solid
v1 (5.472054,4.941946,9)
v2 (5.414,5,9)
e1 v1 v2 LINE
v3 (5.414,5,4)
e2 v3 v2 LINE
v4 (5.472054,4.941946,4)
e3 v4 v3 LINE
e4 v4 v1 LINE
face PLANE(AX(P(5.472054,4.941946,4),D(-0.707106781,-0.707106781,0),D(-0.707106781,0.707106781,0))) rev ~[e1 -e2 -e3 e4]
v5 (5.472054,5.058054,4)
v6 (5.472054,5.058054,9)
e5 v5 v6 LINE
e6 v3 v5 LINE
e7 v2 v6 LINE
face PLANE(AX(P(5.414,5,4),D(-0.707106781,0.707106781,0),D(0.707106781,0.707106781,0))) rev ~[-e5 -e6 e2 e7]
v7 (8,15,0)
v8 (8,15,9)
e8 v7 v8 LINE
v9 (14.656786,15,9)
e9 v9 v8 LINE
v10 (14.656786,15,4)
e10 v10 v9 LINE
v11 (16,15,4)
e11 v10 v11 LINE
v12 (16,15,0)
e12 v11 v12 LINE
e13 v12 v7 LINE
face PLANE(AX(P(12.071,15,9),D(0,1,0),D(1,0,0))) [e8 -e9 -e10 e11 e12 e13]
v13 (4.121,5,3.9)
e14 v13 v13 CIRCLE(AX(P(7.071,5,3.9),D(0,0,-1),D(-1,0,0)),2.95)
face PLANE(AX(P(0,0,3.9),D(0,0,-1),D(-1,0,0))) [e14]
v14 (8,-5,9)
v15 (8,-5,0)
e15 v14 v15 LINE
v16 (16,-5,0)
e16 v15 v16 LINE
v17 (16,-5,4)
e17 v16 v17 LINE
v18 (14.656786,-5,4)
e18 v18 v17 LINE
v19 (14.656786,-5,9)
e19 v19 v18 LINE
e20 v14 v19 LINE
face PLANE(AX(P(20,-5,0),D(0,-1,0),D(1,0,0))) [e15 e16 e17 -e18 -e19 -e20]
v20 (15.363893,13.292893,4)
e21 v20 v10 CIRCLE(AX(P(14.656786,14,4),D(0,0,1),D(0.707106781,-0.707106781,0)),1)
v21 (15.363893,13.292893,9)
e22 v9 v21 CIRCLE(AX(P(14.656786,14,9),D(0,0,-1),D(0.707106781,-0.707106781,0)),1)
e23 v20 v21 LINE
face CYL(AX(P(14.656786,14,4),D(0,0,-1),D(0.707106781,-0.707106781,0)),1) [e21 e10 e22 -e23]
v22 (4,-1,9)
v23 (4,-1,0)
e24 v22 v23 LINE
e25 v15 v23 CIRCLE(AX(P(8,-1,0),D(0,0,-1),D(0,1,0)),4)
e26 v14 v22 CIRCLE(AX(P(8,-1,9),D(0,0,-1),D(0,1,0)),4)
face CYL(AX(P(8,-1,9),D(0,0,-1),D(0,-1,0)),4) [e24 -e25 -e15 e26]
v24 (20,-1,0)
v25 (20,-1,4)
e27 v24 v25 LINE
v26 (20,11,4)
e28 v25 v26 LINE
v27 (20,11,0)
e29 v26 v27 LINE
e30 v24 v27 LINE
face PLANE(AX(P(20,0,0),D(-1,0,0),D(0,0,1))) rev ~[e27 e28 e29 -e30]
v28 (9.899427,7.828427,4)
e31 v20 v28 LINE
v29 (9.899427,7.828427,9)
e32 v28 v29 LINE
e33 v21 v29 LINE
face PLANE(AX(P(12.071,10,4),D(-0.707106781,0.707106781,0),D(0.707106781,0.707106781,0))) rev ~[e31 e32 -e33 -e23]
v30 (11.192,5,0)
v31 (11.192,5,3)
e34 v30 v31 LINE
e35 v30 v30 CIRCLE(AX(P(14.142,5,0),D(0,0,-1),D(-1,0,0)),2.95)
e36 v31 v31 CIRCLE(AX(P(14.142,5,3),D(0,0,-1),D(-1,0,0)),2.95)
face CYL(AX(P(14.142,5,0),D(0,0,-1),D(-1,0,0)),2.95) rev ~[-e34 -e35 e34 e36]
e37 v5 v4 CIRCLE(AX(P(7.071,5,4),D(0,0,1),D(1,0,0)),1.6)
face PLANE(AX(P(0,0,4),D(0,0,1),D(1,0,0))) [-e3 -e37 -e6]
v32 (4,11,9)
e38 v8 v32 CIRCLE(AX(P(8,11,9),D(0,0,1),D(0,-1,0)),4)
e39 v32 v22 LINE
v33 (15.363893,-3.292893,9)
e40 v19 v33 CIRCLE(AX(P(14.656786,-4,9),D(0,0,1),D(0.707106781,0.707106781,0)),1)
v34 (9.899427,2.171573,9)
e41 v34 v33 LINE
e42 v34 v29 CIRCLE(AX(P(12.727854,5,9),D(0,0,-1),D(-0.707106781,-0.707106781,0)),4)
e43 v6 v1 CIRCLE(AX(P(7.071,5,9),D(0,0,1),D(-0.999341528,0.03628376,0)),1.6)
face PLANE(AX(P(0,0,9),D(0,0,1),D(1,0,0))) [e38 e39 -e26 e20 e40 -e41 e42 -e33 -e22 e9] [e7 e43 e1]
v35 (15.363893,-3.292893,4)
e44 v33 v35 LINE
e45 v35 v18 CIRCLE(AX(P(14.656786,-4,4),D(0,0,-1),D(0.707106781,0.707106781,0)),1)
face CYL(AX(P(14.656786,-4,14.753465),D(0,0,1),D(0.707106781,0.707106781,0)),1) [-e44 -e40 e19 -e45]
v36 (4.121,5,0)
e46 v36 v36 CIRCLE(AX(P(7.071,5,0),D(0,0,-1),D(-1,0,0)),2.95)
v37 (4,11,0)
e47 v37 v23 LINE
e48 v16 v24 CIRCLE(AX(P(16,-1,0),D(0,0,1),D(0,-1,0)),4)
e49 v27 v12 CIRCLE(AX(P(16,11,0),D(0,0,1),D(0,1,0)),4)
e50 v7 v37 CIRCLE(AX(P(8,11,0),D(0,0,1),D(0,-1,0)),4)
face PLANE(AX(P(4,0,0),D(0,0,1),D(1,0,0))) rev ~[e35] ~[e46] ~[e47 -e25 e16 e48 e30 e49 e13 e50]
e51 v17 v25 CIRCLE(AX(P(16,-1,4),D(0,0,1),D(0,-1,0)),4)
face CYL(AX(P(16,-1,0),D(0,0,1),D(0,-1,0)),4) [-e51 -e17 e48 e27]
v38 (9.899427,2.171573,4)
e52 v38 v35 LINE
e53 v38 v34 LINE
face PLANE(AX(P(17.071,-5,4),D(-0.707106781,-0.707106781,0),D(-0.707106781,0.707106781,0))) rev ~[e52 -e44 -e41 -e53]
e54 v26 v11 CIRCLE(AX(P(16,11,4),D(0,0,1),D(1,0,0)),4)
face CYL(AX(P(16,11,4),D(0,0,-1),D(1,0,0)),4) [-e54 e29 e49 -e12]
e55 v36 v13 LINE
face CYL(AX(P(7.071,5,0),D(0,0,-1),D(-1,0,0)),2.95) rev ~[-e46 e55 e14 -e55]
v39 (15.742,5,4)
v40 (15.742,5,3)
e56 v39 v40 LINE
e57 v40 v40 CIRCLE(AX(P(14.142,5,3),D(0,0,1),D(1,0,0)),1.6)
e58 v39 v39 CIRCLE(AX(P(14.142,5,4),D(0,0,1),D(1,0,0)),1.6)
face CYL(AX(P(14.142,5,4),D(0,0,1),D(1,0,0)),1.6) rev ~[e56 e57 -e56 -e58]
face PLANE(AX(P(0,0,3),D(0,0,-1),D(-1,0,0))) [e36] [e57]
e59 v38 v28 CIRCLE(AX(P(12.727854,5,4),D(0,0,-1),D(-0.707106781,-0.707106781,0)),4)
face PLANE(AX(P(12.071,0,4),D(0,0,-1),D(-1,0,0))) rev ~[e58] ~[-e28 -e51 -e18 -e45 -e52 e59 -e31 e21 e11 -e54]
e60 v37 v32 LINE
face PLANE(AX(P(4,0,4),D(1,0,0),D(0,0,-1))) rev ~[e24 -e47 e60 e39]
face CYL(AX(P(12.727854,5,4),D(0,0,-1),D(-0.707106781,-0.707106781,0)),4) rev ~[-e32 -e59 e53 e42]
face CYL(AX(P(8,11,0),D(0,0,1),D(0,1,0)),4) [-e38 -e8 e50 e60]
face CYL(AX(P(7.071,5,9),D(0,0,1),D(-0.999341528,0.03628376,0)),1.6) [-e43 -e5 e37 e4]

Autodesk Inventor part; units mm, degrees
ref_plane "YZ Plane" through (0, 0, 0) normal (1, 0, 0) x (0, 1, 0)
ref_plane "XZ Plane" through (0, 0, 0) normal (0, 1, 0) x (-1, 0, 0)
ref_plane "XY Plane" through (0, 0, 0) normal (0, 0, 1) x (1, 0, 0)
sketch "Sketch1" plane through (0, 0, 0) normal (0, 0, 1) x (1, 0, 0)
  line L0 (0, 0) -> (20, 0)
  line L1 (20, 0) -> (20, 10)
  line L2 (20, 10) -> (0, 10)
  line L3 (0, 10) -> (0, 0)
  dimension "d0" = 20
  dimension "d1" = 10
sketch "Sketch1 outline for Extrusion1" plane through (0, 0, 0) normal (0, 0, 1) x (1, 0, 0)
  line L0 (0, 0) -> (20, 0)
  line L1 (0, 10) -> (0, 0)
  line L2 (20, 10) -> (0, 10)
  line L3 (20, 0) -> (20, 10)
extrude "Extrusion1" add sketch "Sketch1 outline for Extrusion1" along normal blind 4
sketch "Sketch2" plane through (0, 0, 4) normal (0, 0, 1) x (1, 0, 0)
  line L0 (0, 10) -> (0, 0) projected
  line L1 (0, 5) -> (7.071, 5)
  line L2 (7.071, 5) -> (14.142, 5)
  circle A0 centre (7.071, 5) radius 1.6
  circle A1 centre (14.142, 5) radius 2.95
  dimension "d4" = 7.071
  dimension "d5" = 7.071
  dimension "d6" = 3.2
  dimension "d7" = 5.9
sketch "Sketch2 outline for Extrusion2" plane through (0, 0, 4) normal (0, 0, 1) x (1, 0, 0)
  circle A0 centre (7.071, 5) radius 1.6
extrude "Extrusion2" cut sketch "Sketch2 outline for Extrusion2" against normal blind 4
sketch "Sketch3" plane through (0, 0, 4) normal (0, 0, 1) x (1, 0, 0)
  circle A0 centre (7.071, 5) radius 1.6 projected
  line L0 (7.071, 5) -> (14.142, 5)
  circle A1 centre (14.142, 5) radius 1.6
  point P0 (0, 0)
  dimension "d10" = 7.071
  dimension "d11" = 3.2
sketch "Sketch3 outline for Extrusion3" plane through (0, 0, 4) normal (0, 0, 1) x (1, 0, 0)
  circle A0 centre (14.142, 5) radius 1.6
extrude "Extrusion3" cut sketch "Sketch3 outline for Extrusion3" against normal blind 3
sketch "Sketch5" plane through (0, 0, 4) normal (0, 0, 1) x (1, 0, 0)
  line L0 (0, 0) -> (20, 0) projected
  line L1 (0, 10) -> (4, 10)
  line L2 (4, 10) -> (4, 0)
  line L3 (4, 0) -> (0, 0)
  line L4 (0, 0) -> (0, 10)
  dimension "d17" = 4
sketch "Sketch5 outline for Extrusion5" plane through (0, 0, 4) normal (0, 0, 1) x (1, 0, 0)
  line L0 (4, 10) -> (0, 10)
  line L1 (4, 0) -> (4, 10)
  line L2 (0, 0) -> (4, 0)
  line L3 (0, 10) -> (0, 0)
extrude "Extrusion5" cut sketch "Sketch5 outline for Extrusion5" against normal blind 4
sketch "Sketch6" plane through (0, 0, 4) normal (0, 0, 1) x (1, 0, 0)
  circle A0 centre (7.071, 5) radius 1.6
  line L0 (7.071, 5) -> (9.899427, 7.828427)
  line L1 (7.071, 5) -> (11.071, 5) construction
  line L2 (20, 10) -> (4, 10)
  line L3 (4, 0) -> (20, 0)
  line L4 (7.071, 5) -> (5.414, 5)
  line L5 (5.414, 5) -> (8.242427, 7.828427)
  line L6 (5.414, 5) -> (9.414, 5) construction
  line L7 (5.414, 5) -> (10.414, 0)
  line L8 (5.414, 5) -> (12.485068, 5) construction
  arc A1 (8.242427, 7.828427) -> (8.242427, 2.171573) centre (11.070854, 5) ccw
  circle A2 centre (7.071, 5) radius 1.6
  line L9 (20, 10) -> (4, 10)
  arc A3 (8.914, 10) -> (10.414, 0) centre (9.664, 5) ccw
  line L10 (8.914, 10) -> (4, 10)
  line L11 (4, 10) -> (4, 0)
  line L12 (4, 0) -> (8.914, 0)
  line L13 (8.914, 0) -> (8.914, 10)
  line L14 (7.071, 5) -> (12.071, 0)
  line L15 (4, 0) -> (20, 0)
  line L16 (7.071, 5) -> (14.142068, 5) construction
  line L17 (9.899427, 7.828427) -> (12.071, 10)
  arc A4 (9.899427, 7.828427) -> (9.899427, 2.171573) centre (12.727854, 5) ccw
  line L18 (8.242427, 7.828427) -> (10.414, 10)
  point P0 (0, 0)
  point P1 (13.001674, 10)
  point P2 (10.571, 0)
  point P3 (9.364849, 1.723072)
  point P4 (8.914, 10)
  point P5 (8.914, 0)
  point P6 (7.390866, 3.432299)
  point P7 (5.472054, 4.941946)
  point P8 (5.472054, 5.058054)
  point P9 (7.390866, 6.567701)
  point P10 (7.012946, 3.401054)
  point P11 (8.914, 1.5)
  point P12 (8.914, 0)
  point P13 (8.914, 10)
  point P14 (8.914, 8.5)
  dimension "d21" = 4
  dimension "d22" = 45
  dimension "d24" = 1.657
  dimension "d25" = 45
  dimension "d26" = 45
  dimension "d27" = 4
  dimension "d35" = 45
  dimension "d36" = 4
sketch "Sketch6 outline for Extrusion6" plane through (0, 0, 4) normal (0, 0, 1) x (1, 0, 0)
  line L0 (5.472054, 4.941946) -> (5.414, 5)
  line L1 (5.414, 5) -> (5.472054, 5.058054)
  arc A0 (5.472054, 5.058054) -> (5.472054, 4.941946) centre (7.071, 5) cw
  line L2 (12.071, 10) -> (4, 10)
  line L3 (4, 10) -> (4, 0)
  line L4 (4, 0) -> (12.071, 0)
  line L5 (12.071, 0) -> (9.899427, 2.171573)
  arc A1 (9.899427, 2.171573) -> (9.899427, 7.828427) centre (12.727854, 5) cw
  line L6 (9.899427, 7.828427) -> (12.071, 10)
extrude "Extrusion6" add sketch "Sketch6 outline for Extrusion6" along normal blind 5
sketch "Sketch8" plane through (0, 0, 0) normal (0, 0, -1) x (-1, 0, 0)
  circle A0 centre (-14.142, 5) radius 1.6 projected
  circle A1 centre (-14.142, 5) radius 2.95
  point P0 (0, 0)
  dimension "d37" = 5.9
sketch "Sketch8 outline for Extrusion8" plane through (0, 0, 0) normal (0, 0, -1) x (-1, 0, 0)
  circle A0 centre (-14.142, 5) radius 2.95
extrude "Extrusion8" cut sketch "Sketch8 outline for Extrusion8" against normal blind 3
sketch "Sketch9" plane through (0, 0, 0) normal (0, 0, -1) x (-1, 0, 0)
  arc A0 (-5.472054, 5.058054) -> (-5.472054, 4.941946) centre (-7.071, 5) ccw
  circle A1 centre (-7.071, 5) radius 2.95
  point P0 (0, 0)
  dimension "d40" = 5.9
sketch "Sketch9 outline for Extrusion9" plane through (0, 0, 0) normal (0, 0, -1) x (-1, 0, 0)
  circle A0 centre (-7.071, 5) radius 2.95
extrude "Extrusion9" cut sketch "Sketch9 outline for Extrusion9" against normal blind 3.9
sketch "Sketch10" plane through (0, 0, 9) normal (0, 0, 1) x (1, 0, 0)
  arc A0 (5.472054, 4.941946) -> (5.472054, 5.058054) centre (7.071, 5) ccw
  circle A1 centre (7.071, 5) radius 1.6
  point P0 (0, 0)
  point P1 (5.472054, 5.058054)
sketch "Sketch10 outline for Extrusion10" plane through (0, 0, 9) normal (0, 0, 1) x (1, 0, 0)
  arc A0 (5.472054, 5.058054) -> (5.472054, 4.941946) centre (7.071, 5) ccw
  arc A1 (5.472054, 4.941946) -> (5.472054, 5.058054) centre (7.071, 5) ccw
extrude "Extrusion10" add sketch "Sketch10 outline for Extrusion10" against normal blind 5.1
sketch "Sketch11" plane through (12.071, 10, 9) normal (0, 1, 0) x (1, 0, 0)
  line L0 (-8.071, 0) -> (-8.071, 9) projected
  line L1 (7.929, 9) -> (7.929, 5) projected
  line L2 (-8.071, 9) -> (7.929, 9)
  line L3 (7.929, 9) -> (7.929, 5)
  line L4 (7.929, 5) -> (-8.071, 5)
  line L5 (-8.071, 5) -> (-8.071, 9)
  point P0 (-12.071, 9)
sketch "Sketch11 outline for Extrusion11" plane through (12.071, 10, 9) normal (0, 1, 0) x (1, 0, 0)
  line L0 (7.929, 9) -> (-8.071, 9)
  line L1 (7.929, 5) -> (7.929, 9)
  line L2 (-8.071, 5) -> (7.929, 5)
  line L3 (-8.071, 9) -> (-8.071, 5)
extrude "Extrusion11" add sketch "Sketch11 outline for Extrusion11" along normal blind 5
sketch "Sketch12" plane through (20, 0, 0) normal (0, -1, 0) x (1, 0, 0)
  line L0 (0, 4) -> (0, 0) projected
  line L1 (-7.929, 4) -> (-16, 4) projected
  line L2 (0, 0) -> (-16, 0)
  line L3 (-16, 0) -> (-16, 4)
  line L4 (-16, 4) -> (0, 4)
  line L5 (0, 4) -> (0, 0)
  point P0 (-20, 0)
sketch "Sketch12 outline for Extrusion12" plane through (20, 0, 0) normal (0, -1, 0) x (1, 0, 0)
  line L0 (-16, 4) -> (-16, 0)
  line L1 (-7.929, 4) -> (-16, 4)
  line L2 (0, 4) -> (-7.929, 4)
  line L3 (0, 0) -> (0, 4)
  line L4 (-16, 0) -> (0, 0)
extrude "Extrusion12" add sketch "Sketch12 outline for Extrusion12" along normal blind 5
sketch "Sketch13" plane through (0, 0, 4) normal (0, 0, 1) x (1, 0, 0)
  line L0 (9.899427, 2.171573) -> (12.071, 0)
  line L1 (12.071, 10) -> (9.899427, 7.828427)
  line L2 (12.071, 10) -> (17.071, 15)
  line L3 (20, 15) -> (4, 15)
  line L4 (12.071, 10) -> (19.142068, 10) construction
  line L5 (20, 15) -> (20, -5)
  line L6 (12.071, 10) -> (4, 10)
  line L7 (4, 10) -> (17.071, 10)
  line L8 (17.071, 10) -> (17.071, 15)
  line L9 (17.071, 15) -> (4, 15)
  line L10 (4, 15) -> (4, 10)
  line L11 (12.071, 0) -> (17.071, -5)
  line L12 (12.071, 0) -> (19.142068, 0) construction
  line L13 (4, 0) -> (12.071, 0)
  line L14 (4, 0) -> (20, 0)
  line L15 (20, 0) -> (20, -5)
  line L16 (20, -5) -> (4, -5)
  line L17 (4, -5) -> (4, 0)
  dimension "d50" = 45
  dimension "d51" = 45
sketch "Sketch13 outline for Extrusion13" plane through (0, 0, 4) normal (0, 0, 1) x (1, 0, 0)
  line L0 (4, 15) -> (4, 10)
  line L1 (17.071, 15) -> (4, 15)
  line L2 (12.071, 10) -> (17.071, 15)
  line L3 (4, 10) -> (12.071, 10)
  line L4 (4, 0) -> (4, -5)
  line L5 (12.071, 0) -> (4, 0)
  line L6 (17.071, -5) -> (12.071, 0)
  line L7 (4, -5) -> (17.071, -5)
extrude "Extrusion13" add sketch "Sketch13 outline for Extrusion13" along normal blind 5
fillet "Fillet2" radius 4 4 edges at (20, 15, 2) (4, 15, 4.5) (20, -5, 2) (4, -5, 4.5)
fillet "Fillet3" radius 1 2 edges at (16.9553, 14.8843, 6.5) (16.9553, -4.8843, 6.5)
properties part number "corner fitter"
